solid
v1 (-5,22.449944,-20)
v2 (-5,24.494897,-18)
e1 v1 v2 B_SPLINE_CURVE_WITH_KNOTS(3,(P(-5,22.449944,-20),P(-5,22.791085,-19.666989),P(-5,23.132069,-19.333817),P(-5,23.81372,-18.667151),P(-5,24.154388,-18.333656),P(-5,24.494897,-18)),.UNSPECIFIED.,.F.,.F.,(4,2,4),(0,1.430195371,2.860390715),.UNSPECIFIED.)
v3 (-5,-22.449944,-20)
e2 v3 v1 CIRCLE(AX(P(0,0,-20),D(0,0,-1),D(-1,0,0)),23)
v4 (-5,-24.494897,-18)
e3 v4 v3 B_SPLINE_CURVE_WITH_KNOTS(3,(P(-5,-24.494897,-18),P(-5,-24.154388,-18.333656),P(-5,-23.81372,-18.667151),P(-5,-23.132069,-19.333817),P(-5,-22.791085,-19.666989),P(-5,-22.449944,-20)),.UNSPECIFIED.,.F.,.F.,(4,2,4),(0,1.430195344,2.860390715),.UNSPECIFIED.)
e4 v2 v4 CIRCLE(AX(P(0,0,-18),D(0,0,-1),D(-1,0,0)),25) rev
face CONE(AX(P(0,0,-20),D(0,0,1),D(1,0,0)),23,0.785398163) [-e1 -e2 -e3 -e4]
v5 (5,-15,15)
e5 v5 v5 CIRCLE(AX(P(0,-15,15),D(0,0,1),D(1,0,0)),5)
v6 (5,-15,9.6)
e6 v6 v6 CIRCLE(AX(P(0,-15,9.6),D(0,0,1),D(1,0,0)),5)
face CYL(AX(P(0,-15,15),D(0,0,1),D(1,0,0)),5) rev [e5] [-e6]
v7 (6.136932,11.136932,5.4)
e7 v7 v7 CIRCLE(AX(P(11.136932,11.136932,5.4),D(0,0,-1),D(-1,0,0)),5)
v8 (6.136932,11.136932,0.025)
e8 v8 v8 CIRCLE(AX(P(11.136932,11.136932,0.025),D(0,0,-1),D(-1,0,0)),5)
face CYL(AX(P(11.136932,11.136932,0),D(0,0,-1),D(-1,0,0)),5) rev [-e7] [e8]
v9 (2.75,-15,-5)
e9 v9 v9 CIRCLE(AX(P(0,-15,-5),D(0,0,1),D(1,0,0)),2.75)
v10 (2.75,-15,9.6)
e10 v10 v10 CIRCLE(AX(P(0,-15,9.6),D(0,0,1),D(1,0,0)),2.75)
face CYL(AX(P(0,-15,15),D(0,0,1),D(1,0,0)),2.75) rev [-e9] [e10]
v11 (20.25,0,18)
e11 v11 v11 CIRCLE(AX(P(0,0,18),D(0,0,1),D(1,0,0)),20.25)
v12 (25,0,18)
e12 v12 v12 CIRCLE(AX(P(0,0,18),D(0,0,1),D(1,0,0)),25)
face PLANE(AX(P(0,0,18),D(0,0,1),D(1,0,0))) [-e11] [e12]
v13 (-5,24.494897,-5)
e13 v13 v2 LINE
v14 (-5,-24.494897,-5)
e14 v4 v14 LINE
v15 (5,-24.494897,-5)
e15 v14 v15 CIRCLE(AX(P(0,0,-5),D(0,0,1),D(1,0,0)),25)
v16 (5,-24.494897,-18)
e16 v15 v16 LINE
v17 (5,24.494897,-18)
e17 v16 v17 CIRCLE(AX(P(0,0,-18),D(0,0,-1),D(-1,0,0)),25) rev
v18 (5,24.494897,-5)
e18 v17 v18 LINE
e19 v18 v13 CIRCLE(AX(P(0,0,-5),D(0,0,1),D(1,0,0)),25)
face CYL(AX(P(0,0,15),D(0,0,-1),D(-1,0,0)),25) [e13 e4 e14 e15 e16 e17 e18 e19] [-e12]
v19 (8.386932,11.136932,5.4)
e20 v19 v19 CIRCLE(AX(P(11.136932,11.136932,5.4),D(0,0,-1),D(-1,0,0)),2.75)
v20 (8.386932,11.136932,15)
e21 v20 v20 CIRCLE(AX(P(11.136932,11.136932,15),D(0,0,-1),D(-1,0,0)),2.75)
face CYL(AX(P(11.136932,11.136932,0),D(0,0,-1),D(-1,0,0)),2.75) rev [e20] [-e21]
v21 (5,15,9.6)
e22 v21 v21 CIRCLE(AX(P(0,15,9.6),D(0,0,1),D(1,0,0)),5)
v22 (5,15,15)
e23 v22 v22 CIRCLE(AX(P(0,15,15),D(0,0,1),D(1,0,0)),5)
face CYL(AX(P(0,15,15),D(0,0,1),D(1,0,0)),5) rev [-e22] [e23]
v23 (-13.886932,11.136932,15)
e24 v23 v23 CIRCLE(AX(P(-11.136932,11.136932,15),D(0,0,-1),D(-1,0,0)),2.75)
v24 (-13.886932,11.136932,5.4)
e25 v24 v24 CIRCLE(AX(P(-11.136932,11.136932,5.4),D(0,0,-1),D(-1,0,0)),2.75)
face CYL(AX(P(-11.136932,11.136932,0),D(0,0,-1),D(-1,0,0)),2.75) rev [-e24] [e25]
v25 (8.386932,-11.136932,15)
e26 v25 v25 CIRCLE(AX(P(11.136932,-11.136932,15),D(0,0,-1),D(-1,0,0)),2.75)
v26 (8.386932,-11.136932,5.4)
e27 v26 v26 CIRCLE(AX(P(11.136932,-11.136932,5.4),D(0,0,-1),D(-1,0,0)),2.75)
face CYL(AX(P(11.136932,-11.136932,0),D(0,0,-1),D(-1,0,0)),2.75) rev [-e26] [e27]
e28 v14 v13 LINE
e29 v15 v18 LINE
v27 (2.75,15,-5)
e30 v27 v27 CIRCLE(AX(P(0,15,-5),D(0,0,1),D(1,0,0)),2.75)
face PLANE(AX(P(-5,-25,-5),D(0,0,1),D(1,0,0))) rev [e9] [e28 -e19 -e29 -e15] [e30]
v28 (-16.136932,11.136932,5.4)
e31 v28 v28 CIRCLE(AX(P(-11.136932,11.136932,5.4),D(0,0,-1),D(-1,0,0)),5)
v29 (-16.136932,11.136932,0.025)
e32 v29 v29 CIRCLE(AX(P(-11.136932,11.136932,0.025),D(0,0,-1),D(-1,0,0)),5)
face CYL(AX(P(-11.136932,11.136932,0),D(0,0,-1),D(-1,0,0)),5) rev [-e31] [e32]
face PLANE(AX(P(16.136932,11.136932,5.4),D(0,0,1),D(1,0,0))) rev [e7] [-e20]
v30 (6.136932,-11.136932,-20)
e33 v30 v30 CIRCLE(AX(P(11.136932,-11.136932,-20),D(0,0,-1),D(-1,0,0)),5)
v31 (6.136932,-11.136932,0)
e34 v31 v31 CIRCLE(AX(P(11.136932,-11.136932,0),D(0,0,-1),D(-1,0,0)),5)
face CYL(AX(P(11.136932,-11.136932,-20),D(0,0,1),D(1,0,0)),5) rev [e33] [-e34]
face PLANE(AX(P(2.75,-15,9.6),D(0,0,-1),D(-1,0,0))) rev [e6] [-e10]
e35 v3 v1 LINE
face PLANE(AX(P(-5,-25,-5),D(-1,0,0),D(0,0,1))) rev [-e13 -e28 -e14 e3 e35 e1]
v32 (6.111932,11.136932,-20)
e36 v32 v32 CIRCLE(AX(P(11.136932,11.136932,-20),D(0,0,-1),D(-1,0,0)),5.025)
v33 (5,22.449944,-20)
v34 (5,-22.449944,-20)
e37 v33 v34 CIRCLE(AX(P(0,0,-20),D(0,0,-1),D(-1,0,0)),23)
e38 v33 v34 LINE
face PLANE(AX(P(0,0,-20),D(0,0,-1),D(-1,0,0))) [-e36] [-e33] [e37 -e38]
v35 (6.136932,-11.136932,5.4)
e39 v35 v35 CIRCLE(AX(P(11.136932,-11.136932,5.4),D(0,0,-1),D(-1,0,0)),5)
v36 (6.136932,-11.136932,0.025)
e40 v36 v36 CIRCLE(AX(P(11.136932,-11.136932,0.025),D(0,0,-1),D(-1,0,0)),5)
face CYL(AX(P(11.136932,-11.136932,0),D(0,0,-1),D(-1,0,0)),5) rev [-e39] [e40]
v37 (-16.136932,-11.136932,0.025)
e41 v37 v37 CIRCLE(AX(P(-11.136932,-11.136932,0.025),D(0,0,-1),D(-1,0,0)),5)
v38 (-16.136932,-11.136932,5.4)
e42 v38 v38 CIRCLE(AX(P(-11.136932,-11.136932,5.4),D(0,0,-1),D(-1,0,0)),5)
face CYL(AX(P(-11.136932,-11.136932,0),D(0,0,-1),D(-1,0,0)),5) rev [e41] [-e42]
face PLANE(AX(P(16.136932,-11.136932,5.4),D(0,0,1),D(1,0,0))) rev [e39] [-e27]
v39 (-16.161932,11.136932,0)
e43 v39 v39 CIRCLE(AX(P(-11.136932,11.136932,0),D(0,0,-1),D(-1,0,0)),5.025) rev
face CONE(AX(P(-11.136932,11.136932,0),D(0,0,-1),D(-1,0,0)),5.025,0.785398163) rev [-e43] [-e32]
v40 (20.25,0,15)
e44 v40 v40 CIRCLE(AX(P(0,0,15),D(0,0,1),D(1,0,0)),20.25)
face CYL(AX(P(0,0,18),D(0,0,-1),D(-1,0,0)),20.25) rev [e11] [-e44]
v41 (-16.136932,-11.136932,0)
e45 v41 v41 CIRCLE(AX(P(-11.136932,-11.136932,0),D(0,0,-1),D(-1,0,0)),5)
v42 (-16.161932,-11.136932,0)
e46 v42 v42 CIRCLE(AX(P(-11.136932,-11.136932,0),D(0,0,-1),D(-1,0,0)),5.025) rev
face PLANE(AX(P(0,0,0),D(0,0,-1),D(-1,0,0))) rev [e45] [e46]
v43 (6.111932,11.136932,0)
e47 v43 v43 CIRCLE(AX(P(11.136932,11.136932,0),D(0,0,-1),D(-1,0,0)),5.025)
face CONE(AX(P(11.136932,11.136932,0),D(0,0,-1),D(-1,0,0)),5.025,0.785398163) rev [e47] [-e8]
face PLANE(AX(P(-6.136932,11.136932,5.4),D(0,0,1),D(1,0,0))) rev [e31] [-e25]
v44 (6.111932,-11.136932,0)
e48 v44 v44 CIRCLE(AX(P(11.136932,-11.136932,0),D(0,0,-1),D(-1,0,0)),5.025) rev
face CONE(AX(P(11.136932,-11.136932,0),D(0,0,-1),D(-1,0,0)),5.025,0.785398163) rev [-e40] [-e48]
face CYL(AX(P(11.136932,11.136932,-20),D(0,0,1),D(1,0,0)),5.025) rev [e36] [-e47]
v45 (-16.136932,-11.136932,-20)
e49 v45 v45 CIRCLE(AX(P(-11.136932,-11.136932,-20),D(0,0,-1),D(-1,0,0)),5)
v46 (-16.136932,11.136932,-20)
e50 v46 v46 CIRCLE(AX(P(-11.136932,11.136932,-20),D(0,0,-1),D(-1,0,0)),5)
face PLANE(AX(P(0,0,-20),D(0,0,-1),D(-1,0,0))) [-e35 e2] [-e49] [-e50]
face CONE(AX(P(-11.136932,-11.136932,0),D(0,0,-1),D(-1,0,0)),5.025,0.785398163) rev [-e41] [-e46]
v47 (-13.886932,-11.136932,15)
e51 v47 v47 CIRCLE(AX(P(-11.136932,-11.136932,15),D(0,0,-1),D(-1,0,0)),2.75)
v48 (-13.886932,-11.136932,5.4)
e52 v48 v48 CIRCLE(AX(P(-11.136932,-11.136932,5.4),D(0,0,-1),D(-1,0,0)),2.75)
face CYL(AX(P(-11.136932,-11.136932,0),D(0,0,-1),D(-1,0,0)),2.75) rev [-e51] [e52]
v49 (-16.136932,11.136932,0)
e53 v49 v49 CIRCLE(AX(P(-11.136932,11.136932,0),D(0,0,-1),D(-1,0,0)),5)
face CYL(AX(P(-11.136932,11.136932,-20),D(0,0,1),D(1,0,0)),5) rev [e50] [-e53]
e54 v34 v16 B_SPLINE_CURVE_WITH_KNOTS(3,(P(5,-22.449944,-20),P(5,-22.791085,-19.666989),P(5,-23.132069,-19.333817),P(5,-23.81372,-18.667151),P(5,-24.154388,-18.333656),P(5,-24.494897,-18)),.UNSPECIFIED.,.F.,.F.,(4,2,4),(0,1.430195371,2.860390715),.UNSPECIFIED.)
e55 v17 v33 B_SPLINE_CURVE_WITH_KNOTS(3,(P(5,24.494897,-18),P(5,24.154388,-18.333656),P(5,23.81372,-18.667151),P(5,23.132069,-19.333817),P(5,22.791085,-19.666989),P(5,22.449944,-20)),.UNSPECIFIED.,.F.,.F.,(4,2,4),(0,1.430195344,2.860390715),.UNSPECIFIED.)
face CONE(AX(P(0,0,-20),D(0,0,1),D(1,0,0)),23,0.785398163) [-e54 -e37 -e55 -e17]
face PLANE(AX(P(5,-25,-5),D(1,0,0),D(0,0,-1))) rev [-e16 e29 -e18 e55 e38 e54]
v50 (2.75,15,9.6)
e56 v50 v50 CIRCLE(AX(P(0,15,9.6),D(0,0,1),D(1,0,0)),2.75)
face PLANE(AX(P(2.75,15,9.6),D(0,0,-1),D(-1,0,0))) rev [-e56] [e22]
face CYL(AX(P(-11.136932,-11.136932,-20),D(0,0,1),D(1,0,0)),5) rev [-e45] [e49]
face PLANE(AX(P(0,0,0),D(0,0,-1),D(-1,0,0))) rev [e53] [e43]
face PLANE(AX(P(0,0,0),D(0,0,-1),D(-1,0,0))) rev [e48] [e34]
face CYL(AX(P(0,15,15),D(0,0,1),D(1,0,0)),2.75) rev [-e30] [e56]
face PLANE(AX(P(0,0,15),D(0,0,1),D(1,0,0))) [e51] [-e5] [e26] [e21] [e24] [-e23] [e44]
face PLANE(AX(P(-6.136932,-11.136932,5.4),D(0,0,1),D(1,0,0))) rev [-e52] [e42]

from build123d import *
from build123d.topology import SkipClean

# Parameters (mm, degrees)
SKETCH1_R                                           = 25
BOSS_EXTRUDE1_DEPTH                                 = 15
CUT_EXTRUDE1_DEPTH                                  = 4
SKETCH3_R                                           = 2
CUT_EXTRUDE2_DEPTH                                  = 39.405728739
CUT_EXTRUDE3_DEPTH                                  = 4
FILLET1_R                                           = 0.5
SKETCH5_R                                           = 0.5
CUT_EXTRUDE4_DEPTH                                  = 8
F_5_5_5_5_DIAMETER_HOLE1_D                          = 5.5
CUT_EXTRUDE5_DEPTH                                  = 37.249138081
SKETCH9_R                                           = 25
SKETCH9_R_2                                         = 20.25
BOSS_EXTRUDE2_DEPTH                                 = 3
BOSS_EXTRUDE3_START                                 = 7
BOSS_EXTRUDE3_DEPTH                                 = 7
FILLET3_R                                           = 1
FILLET4_R                                           = 1
BOSS_EXTRUDE4_START                                 = -8
SKETCH11_R                                          = 25
SKETCH11_R_2                                        = 2.75
BOSS_EXTRUDE4_DEPTH                                 = 8
CBORE_FOR_M5_HEX_SOCKET_HEAD_CAP_SCR_2_COUNT        = 2
CBORE_FOR_M5_HEX_SOCKET_HEAD_CAP_SCR_2_PITCH        = 22.273863607
CBORE_FOR_M5_HEX_SOCKET_HEAD_CAP_SCR_3_COUNT        = 2
CBORE_FOR_M5_HEX_SOCKET_HEAD_CAP_SCR_3_PITCH        = 22.273863607
CBORE_FOR_M5_HEX_SOCKET_HEAD_CAP_SCR_4_COUNT        = 2
CBORE_FOR_M5_HEX_SOCKET_HEAD_CAP_SCR_4_PITCH        = 31.5
BOSS_EXTRUDE5_START                                 = 20
SKETCH15_R                                          = 25
SKETCH15_R_2                                        = 5
SKETCH15_R_3                                        = 5.025
BOSS_EXTRUDE5_DEPTH                                 = 20
CUT_EXTRUDE7_DEPTH                                  = 41.620192146
CUT_EXTRUDE7_DEPTH_BACK                             = 41.620192146
SKETCH16_W                                          = 10
SKETCH16_H                                          = 16.387019029
CBORE_FOR_M5_HEX_SOCKET_HEAD_CAP_SCREW2_D           = 5.5
CBORE_FOR_M5_HEX_SOCKET_HEAD_CAP_SCREW2_CBORE_D     = 10
CBORE_FOR_M5_HEX_SOCKET_HEAD_CAP_SCREW2_CBORE_DEPTH = 5.4
CHAMFER1_SIZE                                       = 2


with BuildPart() as part:
    # Sketch1 → Boss-Extrude1 (new body)
    with BuildSketch(Plane.XY):
        Circle(SKETCH1_R)
    extrude(amount=BOSS_EXTRUDE1_DEPTH)

    # Sketch2 → Cut-Extrude1 (cut)
    with BuildSketch(Plane(origin=(0, 0, 0), x_dir=(-1, 0, 0), z_dir=(0, 0, -1))):
        Polygon((0, 4), (2.3, 4), (2.3, 4.75), (13.4, 4.75), (13.4, 3), (16.4, 3), (16.4, 25), (28.321861399, 25), (28.321861399, -25), (16.4, -25), (16.4, -3), (13.4, -3), (13.4, -4.75), (2.3, -4.75), (2.3, -4), (0, -4), (0, -2), (-29.291687819, -2), (-29.291687819, 2), (0, 2), align=None)
    extrude(amount=-CUT_EXTRUDE1_DEPTH, mode=Mode.SUBTRACT)

    # Sketch3 → Cut-Extrude2 (cut, through all)
    with BuildSketch(Plane.ZY):
        with Locations((4, 0)):
            Circle(SKETCH3_R)
    extrude(amount=-CUT_EXTRUDE2_DEPTH, mode=Mode.SUBTRACT)

    # Sketch4 → Cut-Extrude3 (cut)
    with BuildSketch(Plane(origin=(0, 0, 4), x_dir=(-1, 0, 0), z_dir=(0, 0, -1))):
        with BuildLine():
            Line((0, -2), (0, -4))
            Line((0, -4), (2.3, -4))
            Line((2.3, -4), (2.3, -4.75))
            Line((2.3, -4.75), (13.4, -4.75))
            Line((13.4, -4.75), (13.4, -3))
            Line((13.4, -3), (16.4, -3))
            Line((16.4, -3), (16.4, -18.869022232))
            ThreePointArc((16.4, -18.869022232), (25, 0), (16.4, 18.869022232))
            Line((16.4, 18.869022232), (16.4, 3))
            Line((16.4, 3), (13.4, 3))
            Line((13.4, 3), (13.4, 4.75))
            Line((13.4, 4.75), (2.3, 4.75))
            Line((2.3, 4.75), (2.3, 4))
            Line((2.3, 4), (0, 4))
            Line((0, 4), (0, 2))
            Line((0, 2), (0, -2))
        make_face()
    extrude(amount=-CUT_EXTRUDE3_DEPTH, mode=Mode.SUBTRACT)

    # Fillet1
    fillet1_edges = [part.edges().sort_by_distance(p)[0] for p in [
        (0, -2, 2),
        (0, 2, 2),
        (0, 0, 6),
    ]]
    fillet(fillet1_edges, radius=FILLET1_R)

    # Sketch5 → Cut-Extrude4 (cut)
    with BuildSketch(Plane(origin=(0, 0, 0), x_dir=(-1, 0, 0), z_dir=(0, 0, -1))):
        with Locations((0, 4)):
            Circle(SKETCH5_R)
        with Locations((13.4, 4.75)):
            Circle(SKETCH5_R)
        with Locations((0, -4)):
            Circle(SKETCH5_R)
        with Locations((13.4, -4.75)):
            Circle(SKETCH5_R)
    extrude(amount=-CUT_EXTRUDE4_DEPTH, mode=Mode.SUBTRACT)

    # Ø5.5 (5.5) Diameter Hole1 (through all)
    with Locations(Plane(origin=(0, 0, 0), x_dir=(-1, 0, 0), z_dir=(0, 0, -1))):
        with Locations((-11.136931804, 11.136931804), (11.136931804, 11.136931804), (-11.136931804, -11.136931804), (11.136931804, -11.136931804)):
            Hole(F_5_5_5_5_DIAMETER_HOLE1_D / 2)

    # Sketch8 → Cut-Extrude5 (cut, through all)
    with BuildSketch(Plane(origin=(0, 0, 8), x_dir=(-1, 0, 0), z_dir=(0, 0, -1))):
        with BuildLine():
            Line((16.4, 18.869022232), (16.4, -18.869022232))
            ThreePointArc((16.4, -18.869022232), (25, 0), (16.4, 18.869022232))
        make_face()
    extrude(amount=-CUT_EXTRUDE5_DEPTH, mode=Mode.SUBTRACT)

    # Sketch9 → Boss-Extrude2 (add)
    with BuildSketch(Plane.XY.offset(15)):
        with Locations(Location((0, 0, 0), (0, 0, 130.99551881))):
            Circle(SKETCH9_R)
        with Locations(Location((0, 0, 0), (0, 0, 144.083871109))):
            Circle(SKETCH9_R_2, mode=Mode.SUBTRACT)
    extrude(amount=BOSS_EXTRUDE2_DEPTH)

    # Sketch10 → Boss-Extrude3 (add)
    with SkipClean():  # the faces are left unmerged after this step: merging them gives an invalid solid
        with BuildSketch(Plane(origin=(0, 0, 15), x_dir=(-1, 0, 0), z_dir=(0, 0, -1)).offset(BOSS_EXTRUDE3_START)):
            with BuildLine():
                Line((16.4, 18.869022232), (16.4, -18.869022232))
                ThreePointArc((16.4, -18.869022232), (25, 0), (16.4, 18.869022232))
            make_face()
        extrude(amount=-BOSS_EXTRUDE3_DEPTH)

    # Fillet3
    # the kernel refuses this fillet: 1 mm, written as the material it adds along each edge
    with BuildSketch(Plane(origin=(-2.3, 4.75, 10.420614591), x_dir=(0, -1, 0), z_dir=(0, 0, -1)), Plane(origin=(-2.3, -4.75, 0), x_dir=(0, 1, 0), z_dir=(0, 0, 1))) as fillet3_piece_1:
        with BuildLine():
            CenterArc((1, 0.968245837), FILLET3_R, 180, 75.522487814)
            Line((0, 0.968245837), (-0.02, 0.968245837))
            Line((-0.02, 0.968245837), (-0.02, 0))
            Line((-0.02, 0), (0, -0.02))
            ThreePointArc((0, -0.02), (0.375, -0.02), (0.745, -0.019364917))
            Line((0.745, -0.019364917), (0.75, 0))
        make_face()
    extrude(amount=10.420614591)

    # Fillet4
    # the kernel refuses this fillet: 1 mm, written as the material it takes off along each edge
    with BuildSketch(Plane(origin=(-2.3, 4, 8), x_dir=(-0.44744459774228634, 0.894311652586079, 0), z_dir=(0, 0, -1)), Plane(origin=(-2.3, -4, -1.482509158), x_dir=(-0.44744459774200684, -0.8943116525862188, 0), z_dir=(0, 0, 1))) as fillet4_piece_1:
        with BuildLine():
            CenterArc((0.628975367, 0.977774684), FILLET4_R, 206.57984982, 51.317812547)
            Line((-0.265336285, 0.530330086), (0, 0))
            ThreePointArc((0, 0), (0.209658456, 0.022225316), (0.419316911, 0))
        make_face()
    extrude(amount=9.482509158, mode=Mode.SUBTRACT)

    # Sketch11 → Boss-Extrude4 (add)
    with BuildSketch(Plane(origin=(0, 0, 0), x_dir=(-1, 0, 0), z_dir=(0, 0, -1)).offset(BOSS_EXTRUDE4_START)):
        with Locations(Location((0, 0, 0), (0, 0, 180))):
            Circle(SKETCH11_R)
        with Locations((11.136931804, -11.136931804)):
            Circle(SKETCH11_R_2, mode=Mode.SUBTRACT)
        with Locations((11.136931804, 11.136931804)):
            Circle(SKETCH11_R_2, mode=Mode.SUBTRACT)
        with Locations((-11.136931804, -11.136931804)):
            Circle(SKETCH11_R_2, mode=Mode.SUBTRACT)
        with Locations((-11.136931804, 11.136931804)):
            Circle(SKETCH11_R_2, mode=Mode.SUBTRACT)
    extrude(amount=BOSS_EXTRUDE4_DEPTH)

    # Sketch14 → CBORE for M5 Hex Socket Head Cap Screw1 (revolve, cut)
    with BuildSketch(Plane(origin=(11.136931804, -11.136931804, 0), x_dir=(0, 1, 0), z_dir=(1, 0, 0))):
        Polygon((0, 0), (0, 18), (2.75, 18), (2.75, 5.4), (5, 5.4), (5, 0.025), (5.025, 0), align=None)
    cbore_for_m5_hex_socket_head_cap_screw1 = revolve(axis=Axis((11.136931804, -11.136931804, -6.35), (0, 0, 1)), mode=Mode.SUBTRACT)

    # CBORE for M5 Hex Socket Head Cap Scr 2: CBORE for M5 Hex Socket Head Cap Screw1 ×2
    with Locations(*[(0, i * CBORE_FOR_M5_HEX_SOCKET_HEAD_CAP_SCR_2_PITCH, 0) for i in range(1, CBORE_FOR_M5_HEX_SOCKET_HEAD_CAP_SCR_2_COUNT)]):
        add(cbore_for_m5_hex_socket_head_cap_screw1, mode=Mode.SUBTRACT)

    # CBORE for M5 Hex Socket Head Cap Scr 3: CBORE for M5 Hex Socket Head Cap Screw1 ×2
    with Locations(*[(-i * CBORE_FOR_M5_HEX_SOCKET_HEAD_CAP_SCR_3_PITCH, 0, 0) for i in range(1, CBORE_FOR_M5_HEX_SOCKET_HEAD_CAP_SCR_3_COUNT)]):
        add(cbore_for_m5_hex_socket_head_cap_screw1, mode=Mode.SUBTRACT)

    # CBORE for M5 Hex Socket Head Cap Scr 4: CBORE for M5 Hex Socket Head Cap Screw1 ×2
    with Locations(*[Vector(-0.7071067811865435, 0.7071067811865516, 0) * (i * CBORE_FOR_M5_HEX_SOCKET_HEAD_CAP_SCR_4_PITCH) for i in range(1, CBORE_FOR_M5_HEX_SOCKET_HEAD_CAP_SCR_4_COUNT)]):
        add(cbore_for_m5_hex_socket_head_cap_screw1, mode=Mode.SUBTRACT)

    # Sketch15 → Boss-Extrude5 (add)
    with SkipClean():  # the faces are left unmerged after this step: merging them gives an invalid solid
        with BuildSketch(Plane(origin=(0, 0, 0), x_dir=(-1, 0, 0), z_dir=(0, 0, -1)).offset(BOSS_EXTRUDE5_START)):
            Circle(SKETCH15_R)
            with Locations((-11.136931804, -11.136931804)):
                Circle(SKETCH15_R_2, mode=Mode.SUBTRACT)
            with Locations((-11.136931804, 11.136931804)):
                Circle(SKETCH15_R_3, mode=Mode.SUBTRACT)
            with Locations((11.136931804, -11.136931804)):
                Circle(SKETCH15_R_2, mode=Mode.SUBTRACT)
            with Locations((11.136931804, 11.136931804)):
                Circle(SKETCH15_R_2, mode=Mode.SUBTRACT)
        extrude(amount=-BOSS_EXTRUDE5_DEPTH)
    add(part.part.scale(1), mode=Mode.REPLACE)  # the faces are merged on a copy

    # Sketch16 → Cut-Extrude7 (cut, two sides: drawn at the far end of the back side and taken through both)
    with BuildSketch(Plane(origin=(0, 0, 0), x_dir=(1, 0, 0), z_dir=(0, 1, 0)).offset(-CUT_EXTRUDE7_DEPTH_BACK)):
        with Locations((0, 13.193509515)):
            Rectangle(SKETCH16_W, SKETCH16_H)
    extrude(amount=CUT_EXTRUDE7_DEPTH + CUT_EXTRUDE7_DEPTH_BACK, mode=Mode.SUBTRACT)

    # CBORE for M5 Hex Socket Head Cap Screw2 (through all)
    with Locations(Plane.XY.offset(15)):
        with Locations((0, -15), (0, 15)):
            CounterBoreHole(CBORE_FOR_M5_HEX_SOCKET_HEAD_CAP_SCREW2_D / 2, CBORE_FOR_M5_HEX_SOCKET_HEAD_CAP_SCREW2_CBORE_D / 2, CBORE_FOR_M5_HEX_SOCKET_HEAD_CAP_SCREW2_CBORE_DEPTH)

    # Chamfer1
    chamfer1_edges = [part.edges().sort_by_distance(p)[0] for p in [
        (25, 0, -20),
        (-19.364916731, 15.811388301, -20),
    ]]
    chamfer(chamfer1_edges, length=CHAMFER1_SIZE)


solid = part.part
